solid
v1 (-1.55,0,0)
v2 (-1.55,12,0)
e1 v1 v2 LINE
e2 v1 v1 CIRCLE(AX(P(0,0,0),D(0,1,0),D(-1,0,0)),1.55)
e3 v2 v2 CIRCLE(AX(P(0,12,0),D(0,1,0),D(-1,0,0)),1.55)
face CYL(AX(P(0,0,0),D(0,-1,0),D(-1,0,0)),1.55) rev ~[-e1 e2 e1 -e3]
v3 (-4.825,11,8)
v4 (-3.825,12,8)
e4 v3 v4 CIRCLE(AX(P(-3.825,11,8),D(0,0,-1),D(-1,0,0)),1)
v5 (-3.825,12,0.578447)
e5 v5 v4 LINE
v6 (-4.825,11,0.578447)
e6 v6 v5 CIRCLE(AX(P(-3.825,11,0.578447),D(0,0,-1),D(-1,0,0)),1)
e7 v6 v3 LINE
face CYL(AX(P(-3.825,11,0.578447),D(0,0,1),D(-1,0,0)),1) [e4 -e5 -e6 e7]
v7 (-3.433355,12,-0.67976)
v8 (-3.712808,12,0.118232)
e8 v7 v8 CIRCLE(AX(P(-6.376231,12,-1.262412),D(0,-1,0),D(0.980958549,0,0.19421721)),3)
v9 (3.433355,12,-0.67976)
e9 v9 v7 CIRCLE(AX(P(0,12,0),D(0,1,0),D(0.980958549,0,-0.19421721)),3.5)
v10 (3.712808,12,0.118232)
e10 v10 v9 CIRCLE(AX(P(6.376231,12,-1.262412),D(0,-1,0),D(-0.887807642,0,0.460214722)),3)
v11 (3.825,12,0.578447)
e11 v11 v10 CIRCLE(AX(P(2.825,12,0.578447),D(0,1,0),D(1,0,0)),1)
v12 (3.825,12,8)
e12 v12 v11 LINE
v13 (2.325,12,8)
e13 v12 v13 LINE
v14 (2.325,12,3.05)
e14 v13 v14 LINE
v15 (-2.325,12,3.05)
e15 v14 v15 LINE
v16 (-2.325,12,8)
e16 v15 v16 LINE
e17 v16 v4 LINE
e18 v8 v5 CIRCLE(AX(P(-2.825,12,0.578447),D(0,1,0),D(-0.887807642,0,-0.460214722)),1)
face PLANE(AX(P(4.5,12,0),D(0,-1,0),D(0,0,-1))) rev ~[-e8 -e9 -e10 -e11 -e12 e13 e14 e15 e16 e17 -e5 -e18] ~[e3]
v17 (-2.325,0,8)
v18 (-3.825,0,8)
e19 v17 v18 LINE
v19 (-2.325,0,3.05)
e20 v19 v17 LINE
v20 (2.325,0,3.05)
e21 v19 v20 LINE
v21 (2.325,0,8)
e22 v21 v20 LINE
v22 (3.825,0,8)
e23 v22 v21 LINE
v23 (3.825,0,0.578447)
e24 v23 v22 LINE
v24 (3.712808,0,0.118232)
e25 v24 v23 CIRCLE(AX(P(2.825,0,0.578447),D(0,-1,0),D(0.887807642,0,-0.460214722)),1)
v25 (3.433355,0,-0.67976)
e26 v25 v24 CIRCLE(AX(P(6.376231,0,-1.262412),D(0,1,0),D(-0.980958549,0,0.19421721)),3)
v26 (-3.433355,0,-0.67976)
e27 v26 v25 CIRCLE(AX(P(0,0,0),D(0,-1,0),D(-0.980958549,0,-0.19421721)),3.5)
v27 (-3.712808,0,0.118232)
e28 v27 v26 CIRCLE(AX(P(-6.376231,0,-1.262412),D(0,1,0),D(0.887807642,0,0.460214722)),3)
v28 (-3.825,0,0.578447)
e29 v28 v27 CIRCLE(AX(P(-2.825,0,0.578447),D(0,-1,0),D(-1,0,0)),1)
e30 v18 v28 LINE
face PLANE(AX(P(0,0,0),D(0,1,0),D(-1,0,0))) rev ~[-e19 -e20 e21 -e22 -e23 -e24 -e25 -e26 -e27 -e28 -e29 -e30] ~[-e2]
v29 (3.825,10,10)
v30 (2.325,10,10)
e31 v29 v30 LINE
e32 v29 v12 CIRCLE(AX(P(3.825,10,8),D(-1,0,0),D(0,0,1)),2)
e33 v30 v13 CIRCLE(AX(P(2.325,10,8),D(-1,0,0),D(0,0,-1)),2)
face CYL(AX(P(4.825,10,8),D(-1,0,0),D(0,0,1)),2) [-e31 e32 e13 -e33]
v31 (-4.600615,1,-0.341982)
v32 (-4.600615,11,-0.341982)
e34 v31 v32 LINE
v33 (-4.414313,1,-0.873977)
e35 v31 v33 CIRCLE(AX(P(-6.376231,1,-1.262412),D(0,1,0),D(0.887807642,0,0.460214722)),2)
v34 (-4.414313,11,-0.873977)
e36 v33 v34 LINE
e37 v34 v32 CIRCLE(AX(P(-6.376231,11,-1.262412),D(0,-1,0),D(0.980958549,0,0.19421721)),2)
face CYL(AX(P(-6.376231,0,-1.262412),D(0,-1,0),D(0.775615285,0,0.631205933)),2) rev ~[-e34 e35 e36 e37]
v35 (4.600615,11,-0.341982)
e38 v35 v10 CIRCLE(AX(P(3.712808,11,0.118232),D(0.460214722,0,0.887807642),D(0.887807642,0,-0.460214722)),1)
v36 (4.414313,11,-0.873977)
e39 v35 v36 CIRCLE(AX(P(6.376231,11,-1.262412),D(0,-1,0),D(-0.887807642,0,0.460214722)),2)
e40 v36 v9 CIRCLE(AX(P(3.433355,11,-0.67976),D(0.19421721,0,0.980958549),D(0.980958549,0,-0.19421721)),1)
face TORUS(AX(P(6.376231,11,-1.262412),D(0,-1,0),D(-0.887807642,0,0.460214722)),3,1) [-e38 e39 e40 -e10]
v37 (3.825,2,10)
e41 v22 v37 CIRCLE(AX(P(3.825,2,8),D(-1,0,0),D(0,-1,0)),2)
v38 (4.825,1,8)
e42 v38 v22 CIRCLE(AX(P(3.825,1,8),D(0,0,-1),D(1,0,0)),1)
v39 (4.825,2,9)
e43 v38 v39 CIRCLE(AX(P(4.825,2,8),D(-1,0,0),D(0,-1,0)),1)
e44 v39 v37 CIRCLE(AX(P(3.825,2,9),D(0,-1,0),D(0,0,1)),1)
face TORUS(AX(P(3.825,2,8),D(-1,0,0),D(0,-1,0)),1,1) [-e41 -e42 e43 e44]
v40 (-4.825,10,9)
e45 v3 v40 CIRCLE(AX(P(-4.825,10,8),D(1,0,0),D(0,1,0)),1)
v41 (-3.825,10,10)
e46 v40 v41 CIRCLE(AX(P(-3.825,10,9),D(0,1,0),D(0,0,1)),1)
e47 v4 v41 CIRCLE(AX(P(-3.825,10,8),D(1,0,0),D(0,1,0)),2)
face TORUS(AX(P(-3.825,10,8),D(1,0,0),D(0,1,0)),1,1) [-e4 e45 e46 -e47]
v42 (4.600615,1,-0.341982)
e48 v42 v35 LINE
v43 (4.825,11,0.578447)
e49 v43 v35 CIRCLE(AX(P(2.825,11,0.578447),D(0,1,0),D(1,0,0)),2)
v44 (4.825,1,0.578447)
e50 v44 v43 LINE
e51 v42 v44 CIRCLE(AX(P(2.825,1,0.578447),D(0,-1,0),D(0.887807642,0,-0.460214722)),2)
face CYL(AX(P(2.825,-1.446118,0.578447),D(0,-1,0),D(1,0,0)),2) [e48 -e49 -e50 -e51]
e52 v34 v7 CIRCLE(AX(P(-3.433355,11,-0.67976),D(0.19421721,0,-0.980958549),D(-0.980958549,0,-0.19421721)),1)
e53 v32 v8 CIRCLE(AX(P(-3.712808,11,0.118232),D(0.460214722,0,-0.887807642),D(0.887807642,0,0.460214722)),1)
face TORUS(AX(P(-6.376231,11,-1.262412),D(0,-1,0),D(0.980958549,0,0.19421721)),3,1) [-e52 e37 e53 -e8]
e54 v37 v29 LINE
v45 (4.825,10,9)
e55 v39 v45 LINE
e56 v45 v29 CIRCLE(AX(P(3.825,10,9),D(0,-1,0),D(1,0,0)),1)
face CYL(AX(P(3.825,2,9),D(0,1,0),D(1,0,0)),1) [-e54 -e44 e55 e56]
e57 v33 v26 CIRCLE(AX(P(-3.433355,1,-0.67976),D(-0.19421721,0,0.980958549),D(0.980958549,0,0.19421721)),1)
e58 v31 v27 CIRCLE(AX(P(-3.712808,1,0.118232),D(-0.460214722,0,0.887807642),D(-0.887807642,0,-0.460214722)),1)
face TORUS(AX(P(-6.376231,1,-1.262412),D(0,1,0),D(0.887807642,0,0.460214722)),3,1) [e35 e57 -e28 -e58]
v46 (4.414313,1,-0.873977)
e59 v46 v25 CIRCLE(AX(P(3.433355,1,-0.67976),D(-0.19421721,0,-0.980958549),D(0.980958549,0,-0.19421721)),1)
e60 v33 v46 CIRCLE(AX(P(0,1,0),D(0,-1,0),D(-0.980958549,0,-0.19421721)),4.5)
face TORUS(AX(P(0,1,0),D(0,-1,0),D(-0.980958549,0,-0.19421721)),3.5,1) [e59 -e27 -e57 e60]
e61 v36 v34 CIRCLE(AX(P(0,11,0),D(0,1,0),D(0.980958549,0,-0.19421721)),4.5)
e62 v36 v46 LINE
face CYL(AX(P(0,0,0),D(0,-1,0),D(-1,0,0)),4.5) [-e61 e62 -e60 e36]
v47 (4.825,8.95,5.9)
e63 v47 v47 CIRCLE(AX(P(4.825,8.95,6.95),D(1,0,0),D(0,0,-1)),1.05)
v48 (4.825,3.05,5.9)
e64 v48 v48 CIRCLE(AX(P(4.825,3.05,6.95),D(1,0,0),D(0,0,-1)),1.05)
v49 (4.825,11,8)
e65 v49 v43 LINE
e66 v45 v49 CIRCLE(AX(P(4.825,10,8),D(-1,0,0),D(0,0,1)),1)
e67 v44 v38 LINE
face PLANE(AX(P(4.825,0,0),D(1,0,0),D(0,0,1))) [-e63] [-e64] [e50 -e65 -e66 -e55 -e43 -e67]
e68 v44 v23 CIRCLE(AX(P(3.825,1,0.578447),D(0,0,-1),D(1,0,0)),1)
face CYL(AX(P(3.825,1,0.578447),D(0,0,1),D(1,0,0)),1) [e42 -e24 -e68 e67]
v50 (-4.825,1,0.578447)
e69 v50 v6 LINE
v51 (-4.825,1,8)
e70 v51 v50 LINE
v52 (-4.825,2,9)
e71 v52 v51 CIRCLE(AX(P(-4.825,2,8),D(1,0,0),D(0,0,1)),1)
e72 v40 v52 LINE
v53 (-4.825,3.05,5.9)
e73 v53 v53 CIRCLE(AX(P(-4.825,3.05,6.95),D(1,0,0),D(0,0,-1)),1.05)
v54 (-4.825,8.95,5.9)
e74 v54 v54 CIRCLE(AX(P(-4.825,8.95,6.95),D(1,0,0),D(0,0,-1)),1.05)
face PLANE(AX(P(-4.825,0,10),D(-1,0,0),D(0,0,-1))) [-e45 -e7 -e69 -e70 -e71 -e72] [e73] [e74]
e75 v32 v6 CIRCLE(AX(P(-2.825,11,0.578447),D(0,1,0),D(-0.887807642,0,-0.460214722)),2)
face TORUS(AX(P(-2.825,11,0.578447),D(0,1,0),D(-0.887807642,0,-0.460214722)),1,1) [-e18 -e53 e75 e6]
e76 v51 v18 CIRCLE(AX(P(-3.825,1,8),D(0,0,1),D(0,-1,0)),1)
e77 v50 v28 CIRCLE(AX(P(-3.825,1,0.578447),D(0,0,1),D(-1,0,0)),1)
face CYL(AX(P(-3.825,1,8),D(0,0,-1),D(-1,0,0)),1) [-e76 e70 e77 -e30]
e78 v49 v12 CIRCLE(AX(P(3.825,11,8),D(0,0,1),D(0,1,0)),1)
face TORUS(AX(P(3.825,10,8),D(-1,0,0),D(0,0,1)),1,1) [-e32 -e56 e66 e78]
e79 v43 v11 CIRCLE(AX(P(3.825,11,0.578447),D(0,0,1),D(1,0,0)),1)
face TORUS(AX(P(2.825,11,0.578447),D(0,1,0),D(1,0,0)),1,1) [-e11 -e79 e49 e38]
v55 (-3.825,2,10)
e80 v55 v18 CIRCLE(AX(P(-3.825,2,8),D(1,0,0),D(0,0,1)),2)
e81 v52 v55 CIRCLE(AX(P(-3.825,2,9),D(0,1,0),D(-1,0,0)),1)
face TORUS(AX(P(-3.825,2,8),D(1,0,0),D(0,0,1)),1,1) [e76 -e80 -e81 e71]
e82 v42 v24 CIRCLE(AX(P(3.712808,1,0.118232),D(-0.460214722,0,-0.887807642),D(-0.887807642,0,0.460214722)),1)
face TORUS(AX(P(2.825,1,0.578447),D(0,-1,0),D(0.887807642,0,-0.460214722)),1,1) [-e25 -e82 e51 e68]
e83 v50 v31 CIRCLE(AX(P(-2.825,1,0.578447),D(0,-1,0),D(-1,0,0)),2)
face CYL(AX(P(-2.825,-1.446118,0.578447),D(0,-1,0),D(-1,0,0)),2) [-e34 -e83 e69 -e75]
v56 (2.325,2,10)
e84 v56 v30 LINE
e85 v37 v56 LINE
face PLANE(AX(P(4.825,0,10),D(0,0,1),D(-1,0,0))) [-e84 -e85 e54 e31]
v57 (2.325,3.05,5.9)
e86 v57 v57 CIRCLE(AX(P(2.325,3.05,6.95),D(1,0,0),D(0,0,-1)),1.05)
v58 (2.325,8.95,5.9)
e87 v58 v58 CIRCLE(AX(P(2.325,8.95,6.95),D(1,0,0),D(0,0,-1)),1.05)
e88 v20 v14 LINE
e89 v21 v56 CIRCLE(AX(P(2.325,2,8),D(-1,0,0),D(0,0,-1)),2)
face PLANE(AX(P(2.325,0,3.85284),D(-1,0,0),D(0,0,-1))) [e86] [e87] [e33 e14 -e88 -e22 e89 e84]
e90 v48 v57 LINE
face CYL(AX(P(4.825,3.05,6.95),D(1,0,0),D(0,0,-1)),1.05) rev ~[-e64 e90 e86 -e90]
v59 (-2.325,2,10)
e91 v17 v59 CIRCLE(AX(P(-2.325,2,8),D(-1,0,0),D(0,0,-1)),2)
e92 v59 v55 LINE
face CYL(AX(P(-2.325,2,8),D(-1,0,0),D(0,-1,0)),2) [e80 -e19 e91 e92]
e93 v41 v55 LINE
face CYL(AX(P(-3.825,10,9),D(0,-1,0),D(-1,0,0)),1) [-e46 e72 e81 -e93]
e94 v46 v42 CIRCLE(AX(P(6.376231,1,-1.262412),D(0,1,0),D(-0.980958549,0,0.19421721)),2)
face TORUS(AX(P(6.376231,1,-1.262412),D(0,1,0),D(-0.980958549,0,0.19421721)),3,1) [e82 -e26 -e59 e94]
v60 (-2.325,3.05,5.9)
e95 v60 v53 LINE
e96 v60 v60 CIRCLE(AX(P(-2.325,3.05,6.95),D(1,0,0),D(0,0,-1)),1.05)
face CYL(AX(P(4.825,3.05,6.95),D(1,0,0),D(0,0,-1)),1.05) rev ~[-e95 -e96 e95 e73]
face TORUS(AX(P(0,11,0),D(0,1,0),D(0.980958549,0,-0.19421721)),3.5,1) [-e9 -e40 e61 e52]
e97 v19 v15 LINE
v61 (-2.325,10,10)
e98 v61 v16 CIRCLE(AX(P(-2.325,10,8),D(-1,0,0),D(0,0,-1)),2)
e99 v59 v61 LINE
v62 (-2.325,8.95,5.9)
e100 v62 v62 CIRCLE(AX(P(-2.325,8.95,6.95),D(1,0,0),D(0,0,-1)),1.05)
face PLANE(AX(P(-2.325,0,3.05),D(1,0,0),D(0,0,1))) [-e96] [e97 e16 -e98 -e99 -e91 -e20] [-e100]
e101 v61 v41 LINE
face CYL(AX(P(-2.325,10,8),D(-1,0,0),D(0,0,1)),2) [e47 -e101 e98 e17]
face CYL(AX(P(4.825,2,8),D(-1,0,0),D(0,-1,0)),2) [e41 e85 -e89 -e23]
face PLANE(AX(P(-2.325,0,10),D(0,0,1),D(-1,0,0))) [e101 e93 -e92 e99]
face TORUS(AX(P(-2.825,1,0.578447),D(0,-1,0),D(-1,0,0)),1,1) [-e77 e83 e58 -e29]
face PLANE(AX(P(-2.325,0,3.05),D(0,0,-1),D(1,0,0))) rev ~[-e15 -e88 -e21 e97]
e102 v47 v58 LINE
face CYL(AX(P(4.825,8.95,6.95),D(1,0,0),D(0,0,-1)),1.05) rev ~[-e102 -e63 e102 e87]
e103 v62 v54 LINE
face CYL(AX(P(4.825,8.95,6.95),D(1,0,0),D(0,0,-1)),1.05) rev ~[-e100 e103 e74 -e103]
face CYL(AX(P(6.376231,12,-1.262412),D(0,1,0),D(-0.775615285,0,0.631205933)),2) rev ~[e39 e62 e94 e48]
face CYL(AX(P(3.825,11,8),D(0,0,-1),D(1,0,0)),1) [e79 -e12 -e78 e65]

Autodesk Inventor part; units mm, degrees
ref_plane "YZ Plane" through (0, 0, 0) normal (1, 0, 0) x (0, 1, 0)
ref_plane "XZ Plane" through (0, 0, 0) normal (0, 1, 0) x (-1, 0, 0)
ref_plane "XY Plane" through (0, 0, 0) normal (0, 0, 1) x (1, 0, 0)
sketch "Sketch1" plane through (0, 0, 0) normal (0, 1, 0) x (-1, 0, 0)
  circle A0 centre (0, 0) radius 1.55
  circle A1 centre (0, 0) radius 4.5
  dimension "d0" = 3.1
  dimension "d1" = 9
extrude "Extrusion1" add sketch "Sketch1" along normal blind 12
sketch "Sketch2" plane through (0, 0, 0) normal (0, 1, 0) x (-1, 0, 0)
  line L0 (4.825, 0) -> (-4.825, 0)
  line L1 (-4.825, 0) -> (-4.825, 10)
  line L2 (-4.825, 10) -> (4.825, 10)
  line L3 (4.825, 10) -> (4.825, 0)
  line L4 (2.325, 0) -> (2.325, 10)
  line L5 (-2.325, 10) -> (-2.325, 0)
  circle A0 centre (0, 0) radius 4.5 projected
  circle A1 centre (0, 0) radius 4.5 projected
  line L6 (2.325, 3.05) -> (-2.325, 3.05)
  circle A2 centre (0, 0) radius 1.55 projected
  point P0 (-2.325, 3.8528)
  point P1 (2.325, 3.8528)
  point P2 (-4.5, 0)
  point P3 (4.5, 0)
  dimension "d4" = 4.65
  dimension "d5" = 2.325
  dimension "d6" = 2.5
  dimension "d7" = 2.5
  dimension "d8" = 10
  dimension "d25" = 1.5
extrude "Extrusion2" add sketch "Sketch2" along normal blind 12 contours L0 A0 L4 L2 L3 | L0 L4 A0 | A0 L5 L0 | L0 L1 L2 L5 A0
extrude "Extrusion4" cut sketch "Sketch2" along normal blind 20 contours L4 L6 L5 A0 | A2 L0 | L0 A2
sketch "Sketch3" plane through (4.825, 0, 10) normal (1, 0, 0) x (0, 0, -1)
  circle A0 centre (3.05, 3.05) radius 1.05
  circle A1 centre (3.05, 8.95) radius 1.05
  line L0 (0, 0) -> (0, 12) projected
  line L1 (0, 12) -> (10, 12) projected
  line L2 (0, 0) -> (10, 0) projected
  dimension "d11" = 2.1
  dimension "d12" = 2.1
  dimension "d13" = 2
  dimension "d14" = 2
  dimension "d26" = 5.9
  dimension "d27" = 3.05
extrude "Extrusion3" cut sketch "Sketch3" against normal blind 11
fillet "Fillet2" radius 2 4 edges at (4.5, 6, 0) (-4.5, 6, 0) (-4.825, 6, 0) (4.825, 6, 0)
fillet "Fillet3" radius 2 4 edges at (-3.575, 12, 10) (-3.575, 0, 10) (3.575, 0, 10) (3.575, 12, 10)
fillet "Fillet4" radius 1 16 edges at (0, 12, -4.5) (4.4886, 12, -0.6014) (-4.4886, 12, -0.6014) (-4.825, 12, 4.2892) (-4.825, 11.4142, 9.4142) (-4.825, 6, 10) (-4.825, 0.5858, 9.4142) (-4.825, 0, 4.2892) (4.4886, 0, -0.6014) (-4.4886, 0, -0.6014) (0, 0, -4.5) (4.825, 0, 4.2892) (4.825, 0.5858, 9.4142) (4.825, 6, 10) (4.825, 11.4142, 9.4142) (4.825, 12, 4.2892)
equation "\"d5\" = 0.5 * d4"
properties part number "Feather_clip_acrylic"
